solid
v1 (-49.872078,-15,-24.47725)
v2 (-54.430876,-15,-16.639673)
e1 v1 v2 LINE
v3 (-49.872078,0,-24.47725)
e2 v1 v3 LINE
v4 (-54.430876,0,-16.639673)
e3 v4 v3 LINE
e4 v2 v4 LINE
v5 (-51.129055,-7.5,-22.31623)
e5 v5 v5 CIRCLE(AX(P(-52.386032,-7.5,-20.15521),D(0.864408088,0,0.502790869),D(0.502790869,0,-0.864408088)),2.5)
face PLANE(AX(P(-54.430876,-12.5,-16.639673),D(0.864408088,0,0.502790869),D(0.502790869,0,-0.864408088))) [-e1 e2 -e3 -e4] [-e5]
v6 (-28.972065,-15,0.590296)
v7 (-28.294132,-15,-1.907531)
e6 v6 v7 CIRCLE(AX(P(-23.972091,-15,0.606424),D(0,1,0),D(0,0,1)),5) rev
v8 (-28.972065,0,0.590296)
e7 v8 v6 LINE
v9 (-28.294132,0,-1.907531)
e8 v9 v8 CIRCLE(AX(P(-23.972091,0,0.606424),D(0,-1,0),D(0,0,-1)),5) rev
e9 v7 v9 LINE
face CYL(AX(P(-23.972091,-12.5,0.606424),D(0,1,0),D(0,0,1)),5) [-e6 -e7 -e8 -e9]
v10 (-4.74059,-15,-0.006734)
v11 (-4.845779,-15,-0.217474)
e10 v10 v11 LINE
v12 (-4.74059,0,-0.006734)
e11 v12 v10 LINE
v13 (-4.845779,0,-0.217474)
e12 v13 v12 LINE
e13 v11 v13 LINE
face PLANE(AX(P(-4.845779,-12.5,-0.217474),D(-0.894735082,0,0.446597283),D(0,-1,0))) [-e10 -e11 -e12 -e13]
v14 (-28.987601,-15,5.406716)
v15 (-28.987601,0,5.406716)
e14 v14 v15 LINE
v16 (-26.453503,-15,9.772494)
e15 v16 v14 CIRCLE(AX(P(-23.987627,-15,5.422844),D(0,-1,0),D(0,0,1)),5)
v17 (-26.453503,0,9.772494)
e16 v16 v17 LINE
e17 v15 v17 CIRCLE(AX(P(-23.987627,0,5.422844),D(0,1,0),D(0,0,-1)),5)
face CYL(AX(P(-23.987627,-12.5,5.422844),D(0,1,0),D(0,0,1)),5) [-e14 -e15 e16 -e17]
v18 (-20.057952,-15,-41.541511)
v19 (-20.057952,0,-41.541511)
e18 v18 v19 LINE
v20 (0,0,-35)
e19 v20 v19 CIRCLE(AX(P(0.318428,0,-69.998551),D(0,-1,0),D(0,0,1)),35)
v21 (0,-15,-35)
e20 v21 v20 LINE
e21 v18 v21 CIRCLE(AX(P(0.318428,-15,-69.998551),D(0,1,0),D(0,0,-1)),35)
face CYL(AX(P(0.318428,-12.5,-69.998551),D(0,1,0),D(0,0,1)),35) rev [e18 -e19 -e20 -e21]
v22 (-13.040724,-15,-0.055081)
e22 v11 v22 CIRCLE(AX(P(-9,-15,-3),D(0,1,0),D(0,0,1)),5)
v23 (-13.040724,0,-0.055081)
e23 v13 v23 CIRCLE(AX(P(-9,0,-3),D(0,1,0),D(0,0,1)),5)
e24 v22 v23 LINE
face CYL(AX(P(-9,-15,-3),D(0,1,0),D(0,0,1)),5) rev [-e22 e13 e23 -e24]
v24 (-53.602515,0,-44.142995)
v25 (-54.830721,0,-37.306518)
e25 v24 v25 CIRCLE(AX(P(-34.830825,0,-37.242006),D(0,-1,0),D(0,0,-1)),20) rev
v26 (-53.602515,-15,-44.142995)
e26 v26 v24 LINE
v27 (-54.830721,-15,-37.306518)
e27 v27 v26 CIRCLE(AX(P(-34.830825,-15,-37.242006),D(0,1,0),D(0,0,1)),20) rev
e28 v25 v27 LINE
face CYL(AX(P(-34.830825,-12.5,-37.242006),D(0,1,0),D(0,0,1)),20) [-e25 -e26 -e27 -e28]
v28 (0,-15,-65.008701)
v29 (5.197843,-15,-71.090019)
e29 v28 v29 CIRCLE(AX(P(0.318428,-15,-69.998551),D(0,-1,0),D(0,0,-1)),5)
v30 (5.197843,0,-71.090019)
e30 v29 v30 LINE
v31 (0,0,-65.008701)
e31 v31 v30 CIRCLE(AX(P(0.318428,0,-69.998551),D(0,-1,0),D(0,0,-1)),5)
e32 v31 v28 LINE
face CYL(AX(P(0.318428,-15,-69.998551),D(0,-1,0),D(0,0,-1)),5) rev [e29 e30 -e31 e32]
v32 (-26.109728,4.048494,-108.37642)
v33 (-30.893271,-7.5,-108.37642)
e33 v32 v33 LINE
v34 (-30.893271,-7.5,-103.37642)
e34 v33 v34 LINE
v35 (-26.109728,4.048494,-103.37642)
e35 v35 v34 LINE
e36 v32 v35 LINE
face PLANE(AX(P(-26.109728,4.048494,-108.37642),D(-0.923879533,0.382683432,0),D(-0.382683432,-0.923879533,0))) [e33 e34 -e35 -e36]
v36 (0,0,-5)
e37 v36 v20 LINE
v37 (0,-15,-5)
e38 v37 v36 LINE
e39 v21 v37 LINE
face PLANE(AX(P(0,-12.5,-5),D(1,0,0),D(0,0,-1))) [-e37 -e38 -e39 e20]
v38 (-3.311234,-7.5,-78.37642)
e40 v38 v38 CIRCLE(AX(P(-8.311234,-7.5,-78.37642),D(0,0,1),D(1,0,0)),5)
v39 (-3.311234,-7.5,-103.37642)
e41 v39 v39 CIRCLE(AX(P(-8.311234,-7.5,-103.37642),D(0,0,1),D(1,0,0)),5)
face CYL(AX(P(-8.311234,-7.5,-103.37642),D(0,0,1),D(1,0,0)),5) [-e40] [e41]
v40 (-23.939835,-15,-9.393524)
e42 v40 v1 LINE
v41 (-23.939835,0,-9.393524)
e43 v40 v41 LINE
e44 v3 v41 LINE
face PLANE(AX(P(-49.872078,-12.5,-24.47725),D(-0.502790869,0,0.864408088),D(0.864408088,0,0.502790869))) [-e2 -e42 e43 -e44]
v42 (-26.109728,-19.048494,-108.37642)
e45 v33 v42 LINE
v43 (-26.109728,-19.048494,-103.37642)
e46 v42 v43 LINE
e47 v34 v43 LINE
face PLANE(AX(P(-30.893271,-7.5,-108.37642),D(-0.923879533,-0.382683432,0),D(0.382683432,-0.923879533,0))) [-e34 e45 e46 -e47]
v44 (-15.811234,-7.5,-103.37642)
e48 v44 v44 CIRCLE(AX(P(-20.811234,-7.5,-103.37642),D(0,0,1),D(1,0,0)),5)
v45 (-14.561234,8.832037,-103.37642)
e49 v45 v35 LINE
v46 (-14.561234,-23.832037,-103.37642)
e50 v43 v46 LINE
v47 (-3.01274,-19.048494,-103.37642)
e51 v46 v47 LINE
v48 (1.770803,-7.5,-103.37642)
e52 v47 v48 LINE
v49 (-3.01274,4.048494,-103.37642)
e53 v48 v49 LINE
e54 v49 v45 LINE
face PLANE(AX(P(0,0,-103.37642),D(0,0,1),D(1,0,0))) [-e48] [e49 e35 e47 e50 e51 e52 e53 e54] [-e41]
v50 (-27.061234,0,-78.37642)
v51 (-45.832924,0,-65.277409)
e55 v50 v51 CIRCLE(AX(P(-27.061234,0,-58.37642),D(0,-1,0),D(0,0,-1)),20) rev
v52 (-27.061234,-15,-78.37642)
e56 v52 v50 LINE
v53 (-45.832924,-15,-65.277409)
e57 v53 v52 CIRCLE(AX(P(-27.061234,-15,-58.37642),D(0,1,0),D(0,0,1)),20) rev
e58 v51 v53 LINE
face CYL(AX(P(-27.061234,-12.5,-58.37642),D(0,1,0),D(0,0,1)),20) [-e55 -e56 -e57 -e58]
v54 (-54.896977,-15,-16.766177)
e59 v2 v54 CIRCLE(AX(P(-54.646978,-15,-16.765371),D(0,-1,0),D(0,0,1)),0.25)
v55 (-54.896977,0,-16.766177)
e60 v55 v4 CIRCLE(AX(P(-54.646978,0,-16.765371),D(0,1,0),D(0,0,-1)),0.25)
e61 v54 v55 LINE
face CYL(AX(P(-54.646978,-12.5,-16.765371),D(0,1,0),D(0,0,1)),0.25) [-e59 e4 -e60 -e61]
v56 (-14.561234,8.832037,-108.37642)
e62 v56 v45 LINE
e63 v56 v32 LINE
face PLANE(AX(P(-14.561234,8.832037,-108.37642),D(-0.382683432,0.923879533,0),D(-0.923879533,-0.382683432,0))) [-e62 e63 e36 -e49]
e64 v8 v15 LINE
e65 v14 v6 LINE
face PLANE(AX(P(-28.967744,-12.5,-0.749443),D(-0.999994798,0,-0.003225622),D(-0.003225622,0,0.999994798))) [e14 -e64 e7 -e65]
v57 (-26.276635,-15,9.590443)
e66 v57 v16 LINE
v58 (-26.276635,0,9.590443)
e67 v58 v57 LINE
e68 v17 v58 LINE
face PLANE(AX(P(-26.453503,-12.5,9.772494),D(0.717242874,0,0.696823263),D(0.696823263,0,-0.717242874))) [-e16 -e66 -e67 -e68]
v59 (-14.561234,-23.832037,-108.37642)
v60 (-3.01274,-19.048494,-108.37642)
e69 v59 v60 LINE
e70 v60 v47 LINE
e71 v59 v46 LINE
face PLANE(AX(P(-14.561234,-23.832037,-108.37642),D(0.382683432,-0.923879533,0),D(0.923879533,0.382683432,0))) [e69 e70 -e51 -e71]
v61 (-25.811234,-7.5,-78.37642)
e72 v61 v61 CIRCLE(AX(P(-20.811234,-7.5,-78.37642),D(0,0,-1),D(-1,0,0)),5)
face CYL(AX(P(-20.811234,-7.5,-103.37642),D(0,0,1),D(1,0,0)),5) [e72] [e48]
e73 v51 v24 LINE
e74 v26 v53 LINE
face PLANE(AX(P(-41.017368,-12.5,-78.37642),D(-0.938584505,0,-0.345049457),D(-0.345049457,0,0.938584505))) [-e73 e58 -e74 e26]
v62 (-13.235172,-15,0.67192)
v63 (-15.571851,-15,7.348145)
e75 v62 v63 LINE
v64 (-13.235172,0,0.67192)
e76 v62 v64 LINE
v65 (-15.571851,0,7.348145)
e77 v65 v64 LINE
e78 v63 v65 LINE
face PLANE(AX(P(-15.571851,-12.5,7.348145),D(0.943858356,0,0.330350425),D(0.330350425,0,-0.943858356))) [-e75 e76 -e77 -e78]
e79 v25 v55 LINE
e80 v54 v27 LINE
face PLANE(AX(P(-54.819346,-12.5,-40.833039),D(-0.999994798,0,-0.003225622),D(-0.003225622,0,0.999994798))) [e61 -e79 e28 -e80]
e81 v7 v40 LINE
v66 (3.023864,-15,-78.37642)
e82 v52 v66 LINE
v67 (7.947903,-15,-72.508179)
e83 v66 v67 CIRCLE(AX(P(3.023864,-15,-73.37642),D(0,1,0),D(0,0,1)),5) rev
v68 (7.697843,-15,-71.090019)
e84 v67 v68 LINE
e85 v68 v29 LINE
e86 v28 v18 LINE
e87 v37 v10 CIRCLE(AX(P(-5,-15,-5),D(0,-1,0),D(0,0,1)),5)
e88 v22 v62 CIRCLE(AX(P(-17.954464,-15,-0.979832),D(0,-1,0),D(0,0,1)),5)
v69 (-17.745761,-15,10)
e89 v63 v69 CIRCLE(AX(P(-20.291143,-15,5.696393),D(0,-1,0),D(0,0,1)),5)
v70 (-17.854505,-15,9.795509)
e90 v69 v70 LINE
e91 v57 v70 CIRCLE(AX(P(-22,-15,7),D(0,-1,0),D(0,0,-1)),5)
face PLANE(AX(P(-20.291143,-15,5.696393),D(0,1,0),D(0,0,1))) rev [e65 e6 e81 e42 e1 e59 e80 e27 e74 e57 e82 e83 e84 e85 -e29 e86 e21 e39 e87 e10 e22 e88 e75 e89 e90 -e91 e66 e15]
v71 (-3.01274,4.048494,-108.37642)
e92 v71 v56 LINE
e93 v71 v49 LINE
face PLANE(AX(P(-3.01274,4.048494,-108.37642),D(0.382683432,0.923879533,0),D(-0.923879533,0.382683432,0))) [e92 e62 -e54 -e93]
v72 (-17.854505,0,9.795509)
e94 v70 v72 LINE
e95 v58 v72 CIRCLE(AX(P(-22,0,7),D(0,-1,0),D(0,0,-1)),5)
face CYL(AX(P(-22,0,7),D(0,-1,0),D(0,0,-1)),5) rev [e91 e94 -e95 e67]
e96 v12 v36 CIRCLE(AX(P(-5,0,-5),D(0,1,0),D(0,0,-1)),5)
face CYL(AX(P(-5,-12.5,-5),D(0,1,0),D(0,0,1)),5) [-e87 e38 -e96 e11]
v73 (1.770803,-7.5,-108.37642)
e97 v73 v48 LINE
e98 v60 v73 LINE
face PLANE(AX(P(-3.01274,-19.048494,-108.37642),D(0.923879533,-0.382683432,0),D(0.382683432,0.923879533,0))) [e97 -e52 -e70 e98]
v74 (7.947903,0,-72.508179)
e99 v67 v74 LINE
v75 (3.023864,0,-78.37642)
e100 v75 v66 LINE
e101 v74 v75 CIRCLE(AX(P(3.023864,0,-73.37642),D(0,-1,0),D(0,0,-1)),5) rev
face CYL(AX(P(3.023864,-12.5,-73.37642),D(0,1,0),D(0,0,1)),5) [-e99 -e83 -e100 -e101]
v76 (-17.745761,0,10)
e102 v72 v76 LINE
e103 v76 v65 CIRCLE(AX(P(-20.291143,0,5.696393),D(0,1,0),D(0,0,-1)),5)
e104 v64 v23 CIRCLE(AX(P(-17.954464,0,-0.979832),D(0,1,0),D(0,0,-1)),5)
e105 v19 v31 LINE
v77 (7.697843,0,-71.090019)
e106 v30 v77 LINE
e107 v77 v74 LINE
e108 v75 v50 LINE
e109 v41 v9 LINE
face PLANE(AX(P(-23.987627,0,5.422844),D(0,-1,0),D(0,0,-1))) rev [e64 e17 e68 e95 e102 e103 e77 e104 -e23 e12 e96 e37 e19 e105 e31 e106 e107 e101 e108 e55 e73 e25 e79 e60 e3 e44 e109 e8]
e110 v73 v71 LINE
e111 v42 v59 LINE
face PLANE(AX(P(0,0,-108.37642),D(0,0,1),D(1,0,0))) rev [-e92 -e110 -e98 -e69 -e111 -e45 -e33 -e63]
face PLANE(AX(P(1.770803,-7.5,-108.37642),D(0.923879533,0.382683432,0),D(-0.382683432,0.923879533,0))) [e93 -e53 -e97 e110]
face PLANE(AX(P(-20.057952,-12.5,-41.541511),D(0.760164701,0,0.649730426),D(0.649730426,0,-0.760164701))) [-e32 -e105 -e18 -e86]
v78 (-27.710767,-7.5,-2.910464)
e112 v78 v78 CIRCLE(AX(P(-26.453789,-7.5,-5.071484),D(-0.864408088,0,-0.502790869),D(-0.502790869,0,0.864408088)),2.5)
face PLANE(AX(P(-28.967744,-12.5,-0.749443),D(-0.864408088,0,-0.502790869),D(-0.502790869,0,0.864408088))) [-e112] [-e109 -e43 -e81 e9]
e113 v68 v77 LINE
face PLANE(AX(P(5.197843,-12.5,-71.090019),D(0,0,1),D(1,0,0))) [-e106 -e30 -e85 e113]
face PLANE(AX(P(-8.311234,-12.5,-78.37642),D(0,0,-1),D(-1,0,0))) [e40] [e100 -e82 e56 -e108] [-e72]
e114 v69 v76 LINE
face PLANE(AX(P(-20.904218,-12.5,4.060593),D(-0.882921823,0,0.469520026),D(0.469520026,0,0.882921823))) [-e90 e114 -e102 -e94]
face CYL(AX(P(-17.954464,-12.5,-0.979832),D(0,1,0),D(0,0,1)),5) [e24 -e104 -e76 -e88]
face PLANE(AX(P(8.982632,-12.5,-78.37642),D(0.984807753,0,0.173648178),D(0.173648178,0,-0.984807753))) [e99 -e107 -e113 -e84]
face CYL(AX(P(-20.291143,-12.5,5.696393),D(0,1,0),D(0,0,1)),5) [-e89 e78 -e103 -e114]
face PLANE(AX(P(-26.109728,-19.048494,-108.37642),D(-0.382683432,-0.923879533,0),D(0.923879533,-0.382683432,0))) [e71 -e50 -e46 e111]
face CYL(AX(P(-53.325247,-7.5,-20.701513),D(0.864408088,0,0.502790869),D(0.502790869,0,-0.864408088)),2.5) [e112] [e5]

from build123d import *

# Parameters (mm, degrees)
SKETCH1_W                      = 5
SKETCH1_H                      = 25
BOSS_EXTRUDE1_DEPTH            = 10
BOSS_EXTRUDE2_DEPTH            = 2.5
BOSS_EXTRUDE3_START            = 2.5
BOSS_EXTRUDE3_DEPTH            = 2.5
BOSS_EXTRUDE4_DEPTH            = 5
DRAFT1_ANGLE                   = 60
DRAFT2_ANGLE                   = -10
SKETCH6_W                      = 5
SKETCH6_H                      = 15
SKETCH7_W                      = 5
SKETCH7_H                      = 15
SKETCH8_W                      = 5
SKETCH8_H                      = 25
F_10_0_10_DIAMETER_HOLE1_D     = 10
F_10_0_10_DIAMETER_HOLE1_DEPTH = 23.832037061
FILLET1_R                      = 5
FILLET2_R                      = 20


with BuildPart() as part:
    # Sketch1 → Revolve1 (revolve)
    with BuildSketch(Plane(origin=(0, -7.5, 0), x_dir=(1, 0, 0), z_dir=(0, 1, 0))):
        with Locations((-5.811233855, 90.876419512)):
            Rectangle(SKETCH1_W, SKETCH1_H)
    revolve(axis=Axis((-8.311233855, -7.5, -103.376419512), (0, 0, 1)))

    # Sketch2 → Boss-Extrude1 (add)
    with BuildSketch(Plane(origin=(0, -2.5, 0), x_dir=(1, 0, 0), z_dir=(0, 1, 0))):
        with BuildLine():
            Line((-20.904218066, -4.060593221), (-17.745761276, -10))
            ThreePointArc((-17.745761276, -10), (-16.42436709, -8.86625844), (-15.571850751, -7.348145002))
            Line((-15.571850751, -7.348145002), (-13.235172111, -0.671920317))
            ThreePointArc((-13.235172111, -0.671920317), (-13.124251068, -0.312083076), (-13.040724348, 0.055081199))
            ThreePointArc((-13.040724348, 0.055081199), (-9.034250588, -1.999882688), (-5, 0))
            ThreePointArc((-5, 0), (-1.464466094, 1.464466094), (0, 5))
            Line((0, 5), (0, 35))
            ThreePointArc((0, 35), (-10.533604853, 36.723434751), (-20.057952451, 41.541511272))
            Line((-20.057952451, 41.541511272), (5.197843412, 71.090018979))
            Line((5.197843412, 71.090018979), (8.982632418, 71.090018979))
            Line((8.982632418, 71.090018979), (8.982632418, 78.376419512))
            Line((8.982632418, 78.376419512), (-8.311233855, 78.376419512))
            Line((-8.311233855, 78.376419512), (-41.017367582, 78.376419512))
            Line((-41.017367582, 78.376419512), (-54.819345863, 40.83303933))
            Line((-54.819345863, 40.83303933), (-54.896976862, 16.766177236))
            ThreePointArc((-54.896976862, 16.766177236), (-54.712461515, 16.524099343), (-54.430876141, 16.639673113))
            Line((-54.430876141, 16.639673113), (-49.872077715, 24.477250263))
            Line((-49.872077715, 24.477250263), (-8.967847829, 0.684930874))
            Line((-8.967847829, 0.684930874), (-28.967743782, 0.74944331))
            Line((-28.967743782, 0.74944331), (-28.987601327, -5.406715976))
            ThreePointArc((-28.987601327, -5.406715976), (-28.311946244, -7.932877153), (-26.453503439, -9.772494077))
            Line((-26.453503439, -9.772494077), (-20.904218066, -4.060593221))
        make_face()
    extrude(amount=-BOSS_EXTRUDE1_DEPTH)

    # Sketch3 → Boss-Extrude2 (add)
    with BuildSketch(Plane.XZ.offset(12.5)):
        with BuildLine():
            Line((-20.904218066, 4.060593221), (-17.745761276, 10))
            ThreePointArc((-17.745761276, 10), (-16.42436709, 8.86625844), (-15.571850751, 7.348145002))
            Line((-15.571850751, 7.348145002), (-13.235172111, 0.671920317))
            ThreePointArc((-13.235172111, 0.671920317), (-13.124251068, 0.312083076), (-13.040724348, -0.055081199))
            ThreePointArc((-13.040724348, -0.055081199), (-9.034250588, 1.999882688), (-5, 0))
            ThreePointArc((-5, 0), (-1.464466094, -1.464466094), (0, -5))
            Line((0, -5), (0, -35))
            ThreePointArc((0, -35), (-10.533604853, -36.723434751), (-20.057952451, -41.541511272))
            Line((-20.057952451, -41.541511272), (5.197843412, -71.090018979))
            Line((5.197843412, -71.090018979), (8.982632418, -71.090018979))
            Line((8.982632418, -71.090018979), (8.982632418, -78.376419512))
            Line((8.982632418, -78.376419512), (-41.017367582, -78.376419512))
            Line((-41.017367582, -78.376419512), (-54.819345863, -40.83303933))
            Line((-54.819345863, -40.83303933), (-54.896976862, -16.766177236))
            ThreePointArc((-54.896976862, -16.766177236), (-54.712461515, -16.524099343), (-54.430876141, -16.639673113))
            Line((-54.430876141, -16.639673113), (-49.872077715, -24.477250263))
            Line((-49.872077715, -24.477250263), (-8.967847829, -0.684930874))
            Line((-8.967847829, -0.684930874), (-28.967743782, -0.74944331))
            Line((-28.967743782, -0.74944331), (-28.987601327, 5.406715976))
            ThreePointArc((-28.987601327, 5.406715976), (-28.311946244, 7.932877153), (-26.453503439, 9.772494077))
            Line((-26.453503439, 9.772494077), (-20.904218066, 4.060593221))
        make_face()
    extrude(amount=BOSS_EXTRUDE2_DEPTH)

    # Sketch4 → Boss-Extrude3 (add)
    with BuildSketch(Plane(origin=(0, -2.5, 0), x_dir=(-1, 0, 0), z_dir=(0, 1, 0)).offset(BOSS_EXTRUDE3_START)):
        with BuildLine():
            Line((20.904218066, 4.060593221), (26.453503439, 9.772494077))
            ThreePointArc((26.453503439, 9.772494077), (28.311946244, 7.932877153), (28.987601327, 5.406715976))
            Line((28.987601327, 5.406715976), (28.967743782, -0.74944331))
            Line((28.967743782, -0.74944331), (8.967847829, -0.684930874))
            Line((8.967847829, -0.684930874), (49.872077715, -24.477250263))
            Line((49.872077715, -24.477250263), (54.430876141, -16.639673113))
            ThreePointArc((54.430876141, -16.639673113), (54.712461515, -16.524099343), (54.896976862, -16.766177236))
            Line((54.896976862, -16.766177236), (54.819345863, -40.83303933))
            Line((54.819345863, -40.83303933), (41.017367582, -78.376419512))
            Line((41.017367582, -78.376419512), (-8.982632418, -78.376419512))
            Line((-8.982632418, -78.376419512), (-8.982632418, -71.090018979))
            Line((-8.982632418, -71.090018979), (-5.197843412, -71.090018979))
            Line((-5.197843412, -71.090018979), (20.057952451, -41.541511272))
            ThreePointArc((20.057952451, -41.541511272), (10.533604853, -36.723434751), (0, -35))
            Line((0, -35), (0, -5))
            ThreePointArc((0, -5), (1.464466094, -1.464466094), (5, 0))
            ThreePointArc((5, 0), (9.034250588, 1.999882688), (13.040724348, -0.055081199))
            ThreePointArc((13.040724348, -0.055081199), (13.124251068, 0.312083076), (13.235172111, 0.671920317))
            Line((13.235172111, 0.671920317), (15.571850751, 7.348145002))
            ThreePointArc((15.571850751, 7.348145002), (16.42436709, 8.86625844), (17.745761276, 10))
            Line((17.745761276, 10), (20.904218066, 4.060593221))
        make_face()
    extrude(amount=-BOSS_EXTRUDE3_DEPTH)

    # Sketch5 → Boss-Extrude4 (add)
    with BuildSketch(Plane.XY.offset(-103.376419512)):
        Polygon((-3.012739699, 4.048494156), (-14.561233855, 8.832037061), (-26.109728012, 4.048494156), (-30.893270916, -7.5), (-26.109728012, -19.048494156), (-14.561233855, -23.832037061), (-3.012739699, -19.048494156), (1.770803206, -7.5), align=None)
    extrude(amount=-BOSS_EXTRUDE4_DEPTH)

    # Draft1
    draft1_faces = [part.faces().sort_by_distance(p)[0] for p in [
        (-18.967795805, -7.5, -0.717187092),
    ]]
    draft(draft1_faces, Plane(origin=(-28.967743782, -12.5, -0.74944331), x_dir=(0.0032256218002524395, 0, -0.9999947976684688), z_dir=(-0.9999947976684688, 0, -0.0032256218002524395)), DRAFT1_ANGLE)

    # Draft2
    draft2_faces = [part.faces().sort_by_distance(p)[0] for p in [
        (8.982632418, -7.5, -74.733219246),
    ]]
    draft(draft2_faces, Plane(origin=(-8.311233855, -12.5, -78.376419512), x_dir=(-1, 0, 0), z_dir=(0, 0, -1)), DRAFT2_ANGLE)

    # Sketch6 → Cut-Revolve1 (revolve, cut)
    with BuildSketch(Plane.XY.offset(7)):
        with Locations((-19.5, -7.5)):
            Rectangle(SKETCH6_W, SKETCH6_H)
    revolve(axis=Axis((-22, 0, 7), (0, -1, 0)), mode=Mode.SUBTRACT)

    # Sketch7 → Cut-Revolve2 (revolve, cut)
    with BuildSketch(Plane(origin=(0, 0, -3), x_dir=(-1, 0, 0), z_dir=(0, 0, -1))):
        with Locations((6.5, -7.5)):
            Rectangle(SKETCH7_W, SKETCH7_H)
    revolve(axis=Axis((-9, -15, -3), (0, 1, 0)), mode=Mode.SUBTRACT)

    # Sketch8 → Revolve2 (revolve)
    with BuildSketch(Plane(origin=(0, -7.5, 0), x_dir=(1, 0, 0), z_dir=(0, 1, 0))):
        with Locations((-18.311233855, 90.876419512)):
            Rectangle(SKETCH8_W, SKETCH8_H)
    revolve(axis=Axis((-20.811233855, -7.5, -103.376419512), (0, 0, 1)))

    # Sketch9 → Revolve3 (revolve)
    with BuildSketch(Plane(origin=(0, -7.5, 0), x_dir=(1, 0, 0), z_dir=(0, 1, 0))):
        Polygon((-51.129054889, 22.316230044), (-52.386032062, 20.155209826), (-26.453789436, 5.071483748), (-25.196812263, 7.232503967), align=None)
    revolve(axis=Axis((-53.325247092, -7.5, -20.701512837), (0.8644080875330462, 0, 0.502790869256256)))

    # Ø10.0 (10) Diameter Hole1
    with Locations(Plane(origin=(0, -15, 0), x_dir=(-1, 0, 0), z_dir=(0, -1, 0))):
        with Locations((-0.318427602, 69.998551454)):
            Hole(F_10_0_10_DIAMETER_HOLE1_D / 2, depth=F_10_0_10_DIAMETER_HOLE1_DEPTH)

    # Chamfer1
    # the kernel refuses this chamfer: 0.262951912, 0.262770817 mm, written as the material it takes off along each edge
    with BuildSketch(Plane(origin=(-5, -15.679311202, 0), x_dir=(0.9996632496701223, 4.862291359988254e-15, -0.02594970633688609), z_dir=(0, 1, 0))) as chamfer1_piece_1:
        with BuildLine():
            Line((0.259497063, 0), (0.159812325, 0.213399124))
            ThreePointArc((0.159812325, 0.213399124), (0.082816569, 0.107621918), (0, 0))
            ThreePointArc((0, 0), (0.131972937, -0.001683257), (0.259497063, 0))
        make_face()
    extrude(amount=16.358622404, mode=Mode.SUBTRACT)

    # Fillet1
    fillet1_edges = [part.edges().sort_by_distance(p)[0] for p in [
        (-28.967743782, -7.5, -0.74944331),
        (8.982632418, -7.5, -78.376419512),
    ]]
    fillet(fillet1_edges, radius=FILLET1_R)

    # Fillet2
    fillet2_edges = [part.edges().sort_by_distance(p)[0] for p in [
        (-41.017367582, -7.5, -78.376419512),
        (-54.819345863, -7.5, -40.83303933),
    ]]
    fillet(fillet2_edges, radius=FILLET2_R)


solid = part.part
